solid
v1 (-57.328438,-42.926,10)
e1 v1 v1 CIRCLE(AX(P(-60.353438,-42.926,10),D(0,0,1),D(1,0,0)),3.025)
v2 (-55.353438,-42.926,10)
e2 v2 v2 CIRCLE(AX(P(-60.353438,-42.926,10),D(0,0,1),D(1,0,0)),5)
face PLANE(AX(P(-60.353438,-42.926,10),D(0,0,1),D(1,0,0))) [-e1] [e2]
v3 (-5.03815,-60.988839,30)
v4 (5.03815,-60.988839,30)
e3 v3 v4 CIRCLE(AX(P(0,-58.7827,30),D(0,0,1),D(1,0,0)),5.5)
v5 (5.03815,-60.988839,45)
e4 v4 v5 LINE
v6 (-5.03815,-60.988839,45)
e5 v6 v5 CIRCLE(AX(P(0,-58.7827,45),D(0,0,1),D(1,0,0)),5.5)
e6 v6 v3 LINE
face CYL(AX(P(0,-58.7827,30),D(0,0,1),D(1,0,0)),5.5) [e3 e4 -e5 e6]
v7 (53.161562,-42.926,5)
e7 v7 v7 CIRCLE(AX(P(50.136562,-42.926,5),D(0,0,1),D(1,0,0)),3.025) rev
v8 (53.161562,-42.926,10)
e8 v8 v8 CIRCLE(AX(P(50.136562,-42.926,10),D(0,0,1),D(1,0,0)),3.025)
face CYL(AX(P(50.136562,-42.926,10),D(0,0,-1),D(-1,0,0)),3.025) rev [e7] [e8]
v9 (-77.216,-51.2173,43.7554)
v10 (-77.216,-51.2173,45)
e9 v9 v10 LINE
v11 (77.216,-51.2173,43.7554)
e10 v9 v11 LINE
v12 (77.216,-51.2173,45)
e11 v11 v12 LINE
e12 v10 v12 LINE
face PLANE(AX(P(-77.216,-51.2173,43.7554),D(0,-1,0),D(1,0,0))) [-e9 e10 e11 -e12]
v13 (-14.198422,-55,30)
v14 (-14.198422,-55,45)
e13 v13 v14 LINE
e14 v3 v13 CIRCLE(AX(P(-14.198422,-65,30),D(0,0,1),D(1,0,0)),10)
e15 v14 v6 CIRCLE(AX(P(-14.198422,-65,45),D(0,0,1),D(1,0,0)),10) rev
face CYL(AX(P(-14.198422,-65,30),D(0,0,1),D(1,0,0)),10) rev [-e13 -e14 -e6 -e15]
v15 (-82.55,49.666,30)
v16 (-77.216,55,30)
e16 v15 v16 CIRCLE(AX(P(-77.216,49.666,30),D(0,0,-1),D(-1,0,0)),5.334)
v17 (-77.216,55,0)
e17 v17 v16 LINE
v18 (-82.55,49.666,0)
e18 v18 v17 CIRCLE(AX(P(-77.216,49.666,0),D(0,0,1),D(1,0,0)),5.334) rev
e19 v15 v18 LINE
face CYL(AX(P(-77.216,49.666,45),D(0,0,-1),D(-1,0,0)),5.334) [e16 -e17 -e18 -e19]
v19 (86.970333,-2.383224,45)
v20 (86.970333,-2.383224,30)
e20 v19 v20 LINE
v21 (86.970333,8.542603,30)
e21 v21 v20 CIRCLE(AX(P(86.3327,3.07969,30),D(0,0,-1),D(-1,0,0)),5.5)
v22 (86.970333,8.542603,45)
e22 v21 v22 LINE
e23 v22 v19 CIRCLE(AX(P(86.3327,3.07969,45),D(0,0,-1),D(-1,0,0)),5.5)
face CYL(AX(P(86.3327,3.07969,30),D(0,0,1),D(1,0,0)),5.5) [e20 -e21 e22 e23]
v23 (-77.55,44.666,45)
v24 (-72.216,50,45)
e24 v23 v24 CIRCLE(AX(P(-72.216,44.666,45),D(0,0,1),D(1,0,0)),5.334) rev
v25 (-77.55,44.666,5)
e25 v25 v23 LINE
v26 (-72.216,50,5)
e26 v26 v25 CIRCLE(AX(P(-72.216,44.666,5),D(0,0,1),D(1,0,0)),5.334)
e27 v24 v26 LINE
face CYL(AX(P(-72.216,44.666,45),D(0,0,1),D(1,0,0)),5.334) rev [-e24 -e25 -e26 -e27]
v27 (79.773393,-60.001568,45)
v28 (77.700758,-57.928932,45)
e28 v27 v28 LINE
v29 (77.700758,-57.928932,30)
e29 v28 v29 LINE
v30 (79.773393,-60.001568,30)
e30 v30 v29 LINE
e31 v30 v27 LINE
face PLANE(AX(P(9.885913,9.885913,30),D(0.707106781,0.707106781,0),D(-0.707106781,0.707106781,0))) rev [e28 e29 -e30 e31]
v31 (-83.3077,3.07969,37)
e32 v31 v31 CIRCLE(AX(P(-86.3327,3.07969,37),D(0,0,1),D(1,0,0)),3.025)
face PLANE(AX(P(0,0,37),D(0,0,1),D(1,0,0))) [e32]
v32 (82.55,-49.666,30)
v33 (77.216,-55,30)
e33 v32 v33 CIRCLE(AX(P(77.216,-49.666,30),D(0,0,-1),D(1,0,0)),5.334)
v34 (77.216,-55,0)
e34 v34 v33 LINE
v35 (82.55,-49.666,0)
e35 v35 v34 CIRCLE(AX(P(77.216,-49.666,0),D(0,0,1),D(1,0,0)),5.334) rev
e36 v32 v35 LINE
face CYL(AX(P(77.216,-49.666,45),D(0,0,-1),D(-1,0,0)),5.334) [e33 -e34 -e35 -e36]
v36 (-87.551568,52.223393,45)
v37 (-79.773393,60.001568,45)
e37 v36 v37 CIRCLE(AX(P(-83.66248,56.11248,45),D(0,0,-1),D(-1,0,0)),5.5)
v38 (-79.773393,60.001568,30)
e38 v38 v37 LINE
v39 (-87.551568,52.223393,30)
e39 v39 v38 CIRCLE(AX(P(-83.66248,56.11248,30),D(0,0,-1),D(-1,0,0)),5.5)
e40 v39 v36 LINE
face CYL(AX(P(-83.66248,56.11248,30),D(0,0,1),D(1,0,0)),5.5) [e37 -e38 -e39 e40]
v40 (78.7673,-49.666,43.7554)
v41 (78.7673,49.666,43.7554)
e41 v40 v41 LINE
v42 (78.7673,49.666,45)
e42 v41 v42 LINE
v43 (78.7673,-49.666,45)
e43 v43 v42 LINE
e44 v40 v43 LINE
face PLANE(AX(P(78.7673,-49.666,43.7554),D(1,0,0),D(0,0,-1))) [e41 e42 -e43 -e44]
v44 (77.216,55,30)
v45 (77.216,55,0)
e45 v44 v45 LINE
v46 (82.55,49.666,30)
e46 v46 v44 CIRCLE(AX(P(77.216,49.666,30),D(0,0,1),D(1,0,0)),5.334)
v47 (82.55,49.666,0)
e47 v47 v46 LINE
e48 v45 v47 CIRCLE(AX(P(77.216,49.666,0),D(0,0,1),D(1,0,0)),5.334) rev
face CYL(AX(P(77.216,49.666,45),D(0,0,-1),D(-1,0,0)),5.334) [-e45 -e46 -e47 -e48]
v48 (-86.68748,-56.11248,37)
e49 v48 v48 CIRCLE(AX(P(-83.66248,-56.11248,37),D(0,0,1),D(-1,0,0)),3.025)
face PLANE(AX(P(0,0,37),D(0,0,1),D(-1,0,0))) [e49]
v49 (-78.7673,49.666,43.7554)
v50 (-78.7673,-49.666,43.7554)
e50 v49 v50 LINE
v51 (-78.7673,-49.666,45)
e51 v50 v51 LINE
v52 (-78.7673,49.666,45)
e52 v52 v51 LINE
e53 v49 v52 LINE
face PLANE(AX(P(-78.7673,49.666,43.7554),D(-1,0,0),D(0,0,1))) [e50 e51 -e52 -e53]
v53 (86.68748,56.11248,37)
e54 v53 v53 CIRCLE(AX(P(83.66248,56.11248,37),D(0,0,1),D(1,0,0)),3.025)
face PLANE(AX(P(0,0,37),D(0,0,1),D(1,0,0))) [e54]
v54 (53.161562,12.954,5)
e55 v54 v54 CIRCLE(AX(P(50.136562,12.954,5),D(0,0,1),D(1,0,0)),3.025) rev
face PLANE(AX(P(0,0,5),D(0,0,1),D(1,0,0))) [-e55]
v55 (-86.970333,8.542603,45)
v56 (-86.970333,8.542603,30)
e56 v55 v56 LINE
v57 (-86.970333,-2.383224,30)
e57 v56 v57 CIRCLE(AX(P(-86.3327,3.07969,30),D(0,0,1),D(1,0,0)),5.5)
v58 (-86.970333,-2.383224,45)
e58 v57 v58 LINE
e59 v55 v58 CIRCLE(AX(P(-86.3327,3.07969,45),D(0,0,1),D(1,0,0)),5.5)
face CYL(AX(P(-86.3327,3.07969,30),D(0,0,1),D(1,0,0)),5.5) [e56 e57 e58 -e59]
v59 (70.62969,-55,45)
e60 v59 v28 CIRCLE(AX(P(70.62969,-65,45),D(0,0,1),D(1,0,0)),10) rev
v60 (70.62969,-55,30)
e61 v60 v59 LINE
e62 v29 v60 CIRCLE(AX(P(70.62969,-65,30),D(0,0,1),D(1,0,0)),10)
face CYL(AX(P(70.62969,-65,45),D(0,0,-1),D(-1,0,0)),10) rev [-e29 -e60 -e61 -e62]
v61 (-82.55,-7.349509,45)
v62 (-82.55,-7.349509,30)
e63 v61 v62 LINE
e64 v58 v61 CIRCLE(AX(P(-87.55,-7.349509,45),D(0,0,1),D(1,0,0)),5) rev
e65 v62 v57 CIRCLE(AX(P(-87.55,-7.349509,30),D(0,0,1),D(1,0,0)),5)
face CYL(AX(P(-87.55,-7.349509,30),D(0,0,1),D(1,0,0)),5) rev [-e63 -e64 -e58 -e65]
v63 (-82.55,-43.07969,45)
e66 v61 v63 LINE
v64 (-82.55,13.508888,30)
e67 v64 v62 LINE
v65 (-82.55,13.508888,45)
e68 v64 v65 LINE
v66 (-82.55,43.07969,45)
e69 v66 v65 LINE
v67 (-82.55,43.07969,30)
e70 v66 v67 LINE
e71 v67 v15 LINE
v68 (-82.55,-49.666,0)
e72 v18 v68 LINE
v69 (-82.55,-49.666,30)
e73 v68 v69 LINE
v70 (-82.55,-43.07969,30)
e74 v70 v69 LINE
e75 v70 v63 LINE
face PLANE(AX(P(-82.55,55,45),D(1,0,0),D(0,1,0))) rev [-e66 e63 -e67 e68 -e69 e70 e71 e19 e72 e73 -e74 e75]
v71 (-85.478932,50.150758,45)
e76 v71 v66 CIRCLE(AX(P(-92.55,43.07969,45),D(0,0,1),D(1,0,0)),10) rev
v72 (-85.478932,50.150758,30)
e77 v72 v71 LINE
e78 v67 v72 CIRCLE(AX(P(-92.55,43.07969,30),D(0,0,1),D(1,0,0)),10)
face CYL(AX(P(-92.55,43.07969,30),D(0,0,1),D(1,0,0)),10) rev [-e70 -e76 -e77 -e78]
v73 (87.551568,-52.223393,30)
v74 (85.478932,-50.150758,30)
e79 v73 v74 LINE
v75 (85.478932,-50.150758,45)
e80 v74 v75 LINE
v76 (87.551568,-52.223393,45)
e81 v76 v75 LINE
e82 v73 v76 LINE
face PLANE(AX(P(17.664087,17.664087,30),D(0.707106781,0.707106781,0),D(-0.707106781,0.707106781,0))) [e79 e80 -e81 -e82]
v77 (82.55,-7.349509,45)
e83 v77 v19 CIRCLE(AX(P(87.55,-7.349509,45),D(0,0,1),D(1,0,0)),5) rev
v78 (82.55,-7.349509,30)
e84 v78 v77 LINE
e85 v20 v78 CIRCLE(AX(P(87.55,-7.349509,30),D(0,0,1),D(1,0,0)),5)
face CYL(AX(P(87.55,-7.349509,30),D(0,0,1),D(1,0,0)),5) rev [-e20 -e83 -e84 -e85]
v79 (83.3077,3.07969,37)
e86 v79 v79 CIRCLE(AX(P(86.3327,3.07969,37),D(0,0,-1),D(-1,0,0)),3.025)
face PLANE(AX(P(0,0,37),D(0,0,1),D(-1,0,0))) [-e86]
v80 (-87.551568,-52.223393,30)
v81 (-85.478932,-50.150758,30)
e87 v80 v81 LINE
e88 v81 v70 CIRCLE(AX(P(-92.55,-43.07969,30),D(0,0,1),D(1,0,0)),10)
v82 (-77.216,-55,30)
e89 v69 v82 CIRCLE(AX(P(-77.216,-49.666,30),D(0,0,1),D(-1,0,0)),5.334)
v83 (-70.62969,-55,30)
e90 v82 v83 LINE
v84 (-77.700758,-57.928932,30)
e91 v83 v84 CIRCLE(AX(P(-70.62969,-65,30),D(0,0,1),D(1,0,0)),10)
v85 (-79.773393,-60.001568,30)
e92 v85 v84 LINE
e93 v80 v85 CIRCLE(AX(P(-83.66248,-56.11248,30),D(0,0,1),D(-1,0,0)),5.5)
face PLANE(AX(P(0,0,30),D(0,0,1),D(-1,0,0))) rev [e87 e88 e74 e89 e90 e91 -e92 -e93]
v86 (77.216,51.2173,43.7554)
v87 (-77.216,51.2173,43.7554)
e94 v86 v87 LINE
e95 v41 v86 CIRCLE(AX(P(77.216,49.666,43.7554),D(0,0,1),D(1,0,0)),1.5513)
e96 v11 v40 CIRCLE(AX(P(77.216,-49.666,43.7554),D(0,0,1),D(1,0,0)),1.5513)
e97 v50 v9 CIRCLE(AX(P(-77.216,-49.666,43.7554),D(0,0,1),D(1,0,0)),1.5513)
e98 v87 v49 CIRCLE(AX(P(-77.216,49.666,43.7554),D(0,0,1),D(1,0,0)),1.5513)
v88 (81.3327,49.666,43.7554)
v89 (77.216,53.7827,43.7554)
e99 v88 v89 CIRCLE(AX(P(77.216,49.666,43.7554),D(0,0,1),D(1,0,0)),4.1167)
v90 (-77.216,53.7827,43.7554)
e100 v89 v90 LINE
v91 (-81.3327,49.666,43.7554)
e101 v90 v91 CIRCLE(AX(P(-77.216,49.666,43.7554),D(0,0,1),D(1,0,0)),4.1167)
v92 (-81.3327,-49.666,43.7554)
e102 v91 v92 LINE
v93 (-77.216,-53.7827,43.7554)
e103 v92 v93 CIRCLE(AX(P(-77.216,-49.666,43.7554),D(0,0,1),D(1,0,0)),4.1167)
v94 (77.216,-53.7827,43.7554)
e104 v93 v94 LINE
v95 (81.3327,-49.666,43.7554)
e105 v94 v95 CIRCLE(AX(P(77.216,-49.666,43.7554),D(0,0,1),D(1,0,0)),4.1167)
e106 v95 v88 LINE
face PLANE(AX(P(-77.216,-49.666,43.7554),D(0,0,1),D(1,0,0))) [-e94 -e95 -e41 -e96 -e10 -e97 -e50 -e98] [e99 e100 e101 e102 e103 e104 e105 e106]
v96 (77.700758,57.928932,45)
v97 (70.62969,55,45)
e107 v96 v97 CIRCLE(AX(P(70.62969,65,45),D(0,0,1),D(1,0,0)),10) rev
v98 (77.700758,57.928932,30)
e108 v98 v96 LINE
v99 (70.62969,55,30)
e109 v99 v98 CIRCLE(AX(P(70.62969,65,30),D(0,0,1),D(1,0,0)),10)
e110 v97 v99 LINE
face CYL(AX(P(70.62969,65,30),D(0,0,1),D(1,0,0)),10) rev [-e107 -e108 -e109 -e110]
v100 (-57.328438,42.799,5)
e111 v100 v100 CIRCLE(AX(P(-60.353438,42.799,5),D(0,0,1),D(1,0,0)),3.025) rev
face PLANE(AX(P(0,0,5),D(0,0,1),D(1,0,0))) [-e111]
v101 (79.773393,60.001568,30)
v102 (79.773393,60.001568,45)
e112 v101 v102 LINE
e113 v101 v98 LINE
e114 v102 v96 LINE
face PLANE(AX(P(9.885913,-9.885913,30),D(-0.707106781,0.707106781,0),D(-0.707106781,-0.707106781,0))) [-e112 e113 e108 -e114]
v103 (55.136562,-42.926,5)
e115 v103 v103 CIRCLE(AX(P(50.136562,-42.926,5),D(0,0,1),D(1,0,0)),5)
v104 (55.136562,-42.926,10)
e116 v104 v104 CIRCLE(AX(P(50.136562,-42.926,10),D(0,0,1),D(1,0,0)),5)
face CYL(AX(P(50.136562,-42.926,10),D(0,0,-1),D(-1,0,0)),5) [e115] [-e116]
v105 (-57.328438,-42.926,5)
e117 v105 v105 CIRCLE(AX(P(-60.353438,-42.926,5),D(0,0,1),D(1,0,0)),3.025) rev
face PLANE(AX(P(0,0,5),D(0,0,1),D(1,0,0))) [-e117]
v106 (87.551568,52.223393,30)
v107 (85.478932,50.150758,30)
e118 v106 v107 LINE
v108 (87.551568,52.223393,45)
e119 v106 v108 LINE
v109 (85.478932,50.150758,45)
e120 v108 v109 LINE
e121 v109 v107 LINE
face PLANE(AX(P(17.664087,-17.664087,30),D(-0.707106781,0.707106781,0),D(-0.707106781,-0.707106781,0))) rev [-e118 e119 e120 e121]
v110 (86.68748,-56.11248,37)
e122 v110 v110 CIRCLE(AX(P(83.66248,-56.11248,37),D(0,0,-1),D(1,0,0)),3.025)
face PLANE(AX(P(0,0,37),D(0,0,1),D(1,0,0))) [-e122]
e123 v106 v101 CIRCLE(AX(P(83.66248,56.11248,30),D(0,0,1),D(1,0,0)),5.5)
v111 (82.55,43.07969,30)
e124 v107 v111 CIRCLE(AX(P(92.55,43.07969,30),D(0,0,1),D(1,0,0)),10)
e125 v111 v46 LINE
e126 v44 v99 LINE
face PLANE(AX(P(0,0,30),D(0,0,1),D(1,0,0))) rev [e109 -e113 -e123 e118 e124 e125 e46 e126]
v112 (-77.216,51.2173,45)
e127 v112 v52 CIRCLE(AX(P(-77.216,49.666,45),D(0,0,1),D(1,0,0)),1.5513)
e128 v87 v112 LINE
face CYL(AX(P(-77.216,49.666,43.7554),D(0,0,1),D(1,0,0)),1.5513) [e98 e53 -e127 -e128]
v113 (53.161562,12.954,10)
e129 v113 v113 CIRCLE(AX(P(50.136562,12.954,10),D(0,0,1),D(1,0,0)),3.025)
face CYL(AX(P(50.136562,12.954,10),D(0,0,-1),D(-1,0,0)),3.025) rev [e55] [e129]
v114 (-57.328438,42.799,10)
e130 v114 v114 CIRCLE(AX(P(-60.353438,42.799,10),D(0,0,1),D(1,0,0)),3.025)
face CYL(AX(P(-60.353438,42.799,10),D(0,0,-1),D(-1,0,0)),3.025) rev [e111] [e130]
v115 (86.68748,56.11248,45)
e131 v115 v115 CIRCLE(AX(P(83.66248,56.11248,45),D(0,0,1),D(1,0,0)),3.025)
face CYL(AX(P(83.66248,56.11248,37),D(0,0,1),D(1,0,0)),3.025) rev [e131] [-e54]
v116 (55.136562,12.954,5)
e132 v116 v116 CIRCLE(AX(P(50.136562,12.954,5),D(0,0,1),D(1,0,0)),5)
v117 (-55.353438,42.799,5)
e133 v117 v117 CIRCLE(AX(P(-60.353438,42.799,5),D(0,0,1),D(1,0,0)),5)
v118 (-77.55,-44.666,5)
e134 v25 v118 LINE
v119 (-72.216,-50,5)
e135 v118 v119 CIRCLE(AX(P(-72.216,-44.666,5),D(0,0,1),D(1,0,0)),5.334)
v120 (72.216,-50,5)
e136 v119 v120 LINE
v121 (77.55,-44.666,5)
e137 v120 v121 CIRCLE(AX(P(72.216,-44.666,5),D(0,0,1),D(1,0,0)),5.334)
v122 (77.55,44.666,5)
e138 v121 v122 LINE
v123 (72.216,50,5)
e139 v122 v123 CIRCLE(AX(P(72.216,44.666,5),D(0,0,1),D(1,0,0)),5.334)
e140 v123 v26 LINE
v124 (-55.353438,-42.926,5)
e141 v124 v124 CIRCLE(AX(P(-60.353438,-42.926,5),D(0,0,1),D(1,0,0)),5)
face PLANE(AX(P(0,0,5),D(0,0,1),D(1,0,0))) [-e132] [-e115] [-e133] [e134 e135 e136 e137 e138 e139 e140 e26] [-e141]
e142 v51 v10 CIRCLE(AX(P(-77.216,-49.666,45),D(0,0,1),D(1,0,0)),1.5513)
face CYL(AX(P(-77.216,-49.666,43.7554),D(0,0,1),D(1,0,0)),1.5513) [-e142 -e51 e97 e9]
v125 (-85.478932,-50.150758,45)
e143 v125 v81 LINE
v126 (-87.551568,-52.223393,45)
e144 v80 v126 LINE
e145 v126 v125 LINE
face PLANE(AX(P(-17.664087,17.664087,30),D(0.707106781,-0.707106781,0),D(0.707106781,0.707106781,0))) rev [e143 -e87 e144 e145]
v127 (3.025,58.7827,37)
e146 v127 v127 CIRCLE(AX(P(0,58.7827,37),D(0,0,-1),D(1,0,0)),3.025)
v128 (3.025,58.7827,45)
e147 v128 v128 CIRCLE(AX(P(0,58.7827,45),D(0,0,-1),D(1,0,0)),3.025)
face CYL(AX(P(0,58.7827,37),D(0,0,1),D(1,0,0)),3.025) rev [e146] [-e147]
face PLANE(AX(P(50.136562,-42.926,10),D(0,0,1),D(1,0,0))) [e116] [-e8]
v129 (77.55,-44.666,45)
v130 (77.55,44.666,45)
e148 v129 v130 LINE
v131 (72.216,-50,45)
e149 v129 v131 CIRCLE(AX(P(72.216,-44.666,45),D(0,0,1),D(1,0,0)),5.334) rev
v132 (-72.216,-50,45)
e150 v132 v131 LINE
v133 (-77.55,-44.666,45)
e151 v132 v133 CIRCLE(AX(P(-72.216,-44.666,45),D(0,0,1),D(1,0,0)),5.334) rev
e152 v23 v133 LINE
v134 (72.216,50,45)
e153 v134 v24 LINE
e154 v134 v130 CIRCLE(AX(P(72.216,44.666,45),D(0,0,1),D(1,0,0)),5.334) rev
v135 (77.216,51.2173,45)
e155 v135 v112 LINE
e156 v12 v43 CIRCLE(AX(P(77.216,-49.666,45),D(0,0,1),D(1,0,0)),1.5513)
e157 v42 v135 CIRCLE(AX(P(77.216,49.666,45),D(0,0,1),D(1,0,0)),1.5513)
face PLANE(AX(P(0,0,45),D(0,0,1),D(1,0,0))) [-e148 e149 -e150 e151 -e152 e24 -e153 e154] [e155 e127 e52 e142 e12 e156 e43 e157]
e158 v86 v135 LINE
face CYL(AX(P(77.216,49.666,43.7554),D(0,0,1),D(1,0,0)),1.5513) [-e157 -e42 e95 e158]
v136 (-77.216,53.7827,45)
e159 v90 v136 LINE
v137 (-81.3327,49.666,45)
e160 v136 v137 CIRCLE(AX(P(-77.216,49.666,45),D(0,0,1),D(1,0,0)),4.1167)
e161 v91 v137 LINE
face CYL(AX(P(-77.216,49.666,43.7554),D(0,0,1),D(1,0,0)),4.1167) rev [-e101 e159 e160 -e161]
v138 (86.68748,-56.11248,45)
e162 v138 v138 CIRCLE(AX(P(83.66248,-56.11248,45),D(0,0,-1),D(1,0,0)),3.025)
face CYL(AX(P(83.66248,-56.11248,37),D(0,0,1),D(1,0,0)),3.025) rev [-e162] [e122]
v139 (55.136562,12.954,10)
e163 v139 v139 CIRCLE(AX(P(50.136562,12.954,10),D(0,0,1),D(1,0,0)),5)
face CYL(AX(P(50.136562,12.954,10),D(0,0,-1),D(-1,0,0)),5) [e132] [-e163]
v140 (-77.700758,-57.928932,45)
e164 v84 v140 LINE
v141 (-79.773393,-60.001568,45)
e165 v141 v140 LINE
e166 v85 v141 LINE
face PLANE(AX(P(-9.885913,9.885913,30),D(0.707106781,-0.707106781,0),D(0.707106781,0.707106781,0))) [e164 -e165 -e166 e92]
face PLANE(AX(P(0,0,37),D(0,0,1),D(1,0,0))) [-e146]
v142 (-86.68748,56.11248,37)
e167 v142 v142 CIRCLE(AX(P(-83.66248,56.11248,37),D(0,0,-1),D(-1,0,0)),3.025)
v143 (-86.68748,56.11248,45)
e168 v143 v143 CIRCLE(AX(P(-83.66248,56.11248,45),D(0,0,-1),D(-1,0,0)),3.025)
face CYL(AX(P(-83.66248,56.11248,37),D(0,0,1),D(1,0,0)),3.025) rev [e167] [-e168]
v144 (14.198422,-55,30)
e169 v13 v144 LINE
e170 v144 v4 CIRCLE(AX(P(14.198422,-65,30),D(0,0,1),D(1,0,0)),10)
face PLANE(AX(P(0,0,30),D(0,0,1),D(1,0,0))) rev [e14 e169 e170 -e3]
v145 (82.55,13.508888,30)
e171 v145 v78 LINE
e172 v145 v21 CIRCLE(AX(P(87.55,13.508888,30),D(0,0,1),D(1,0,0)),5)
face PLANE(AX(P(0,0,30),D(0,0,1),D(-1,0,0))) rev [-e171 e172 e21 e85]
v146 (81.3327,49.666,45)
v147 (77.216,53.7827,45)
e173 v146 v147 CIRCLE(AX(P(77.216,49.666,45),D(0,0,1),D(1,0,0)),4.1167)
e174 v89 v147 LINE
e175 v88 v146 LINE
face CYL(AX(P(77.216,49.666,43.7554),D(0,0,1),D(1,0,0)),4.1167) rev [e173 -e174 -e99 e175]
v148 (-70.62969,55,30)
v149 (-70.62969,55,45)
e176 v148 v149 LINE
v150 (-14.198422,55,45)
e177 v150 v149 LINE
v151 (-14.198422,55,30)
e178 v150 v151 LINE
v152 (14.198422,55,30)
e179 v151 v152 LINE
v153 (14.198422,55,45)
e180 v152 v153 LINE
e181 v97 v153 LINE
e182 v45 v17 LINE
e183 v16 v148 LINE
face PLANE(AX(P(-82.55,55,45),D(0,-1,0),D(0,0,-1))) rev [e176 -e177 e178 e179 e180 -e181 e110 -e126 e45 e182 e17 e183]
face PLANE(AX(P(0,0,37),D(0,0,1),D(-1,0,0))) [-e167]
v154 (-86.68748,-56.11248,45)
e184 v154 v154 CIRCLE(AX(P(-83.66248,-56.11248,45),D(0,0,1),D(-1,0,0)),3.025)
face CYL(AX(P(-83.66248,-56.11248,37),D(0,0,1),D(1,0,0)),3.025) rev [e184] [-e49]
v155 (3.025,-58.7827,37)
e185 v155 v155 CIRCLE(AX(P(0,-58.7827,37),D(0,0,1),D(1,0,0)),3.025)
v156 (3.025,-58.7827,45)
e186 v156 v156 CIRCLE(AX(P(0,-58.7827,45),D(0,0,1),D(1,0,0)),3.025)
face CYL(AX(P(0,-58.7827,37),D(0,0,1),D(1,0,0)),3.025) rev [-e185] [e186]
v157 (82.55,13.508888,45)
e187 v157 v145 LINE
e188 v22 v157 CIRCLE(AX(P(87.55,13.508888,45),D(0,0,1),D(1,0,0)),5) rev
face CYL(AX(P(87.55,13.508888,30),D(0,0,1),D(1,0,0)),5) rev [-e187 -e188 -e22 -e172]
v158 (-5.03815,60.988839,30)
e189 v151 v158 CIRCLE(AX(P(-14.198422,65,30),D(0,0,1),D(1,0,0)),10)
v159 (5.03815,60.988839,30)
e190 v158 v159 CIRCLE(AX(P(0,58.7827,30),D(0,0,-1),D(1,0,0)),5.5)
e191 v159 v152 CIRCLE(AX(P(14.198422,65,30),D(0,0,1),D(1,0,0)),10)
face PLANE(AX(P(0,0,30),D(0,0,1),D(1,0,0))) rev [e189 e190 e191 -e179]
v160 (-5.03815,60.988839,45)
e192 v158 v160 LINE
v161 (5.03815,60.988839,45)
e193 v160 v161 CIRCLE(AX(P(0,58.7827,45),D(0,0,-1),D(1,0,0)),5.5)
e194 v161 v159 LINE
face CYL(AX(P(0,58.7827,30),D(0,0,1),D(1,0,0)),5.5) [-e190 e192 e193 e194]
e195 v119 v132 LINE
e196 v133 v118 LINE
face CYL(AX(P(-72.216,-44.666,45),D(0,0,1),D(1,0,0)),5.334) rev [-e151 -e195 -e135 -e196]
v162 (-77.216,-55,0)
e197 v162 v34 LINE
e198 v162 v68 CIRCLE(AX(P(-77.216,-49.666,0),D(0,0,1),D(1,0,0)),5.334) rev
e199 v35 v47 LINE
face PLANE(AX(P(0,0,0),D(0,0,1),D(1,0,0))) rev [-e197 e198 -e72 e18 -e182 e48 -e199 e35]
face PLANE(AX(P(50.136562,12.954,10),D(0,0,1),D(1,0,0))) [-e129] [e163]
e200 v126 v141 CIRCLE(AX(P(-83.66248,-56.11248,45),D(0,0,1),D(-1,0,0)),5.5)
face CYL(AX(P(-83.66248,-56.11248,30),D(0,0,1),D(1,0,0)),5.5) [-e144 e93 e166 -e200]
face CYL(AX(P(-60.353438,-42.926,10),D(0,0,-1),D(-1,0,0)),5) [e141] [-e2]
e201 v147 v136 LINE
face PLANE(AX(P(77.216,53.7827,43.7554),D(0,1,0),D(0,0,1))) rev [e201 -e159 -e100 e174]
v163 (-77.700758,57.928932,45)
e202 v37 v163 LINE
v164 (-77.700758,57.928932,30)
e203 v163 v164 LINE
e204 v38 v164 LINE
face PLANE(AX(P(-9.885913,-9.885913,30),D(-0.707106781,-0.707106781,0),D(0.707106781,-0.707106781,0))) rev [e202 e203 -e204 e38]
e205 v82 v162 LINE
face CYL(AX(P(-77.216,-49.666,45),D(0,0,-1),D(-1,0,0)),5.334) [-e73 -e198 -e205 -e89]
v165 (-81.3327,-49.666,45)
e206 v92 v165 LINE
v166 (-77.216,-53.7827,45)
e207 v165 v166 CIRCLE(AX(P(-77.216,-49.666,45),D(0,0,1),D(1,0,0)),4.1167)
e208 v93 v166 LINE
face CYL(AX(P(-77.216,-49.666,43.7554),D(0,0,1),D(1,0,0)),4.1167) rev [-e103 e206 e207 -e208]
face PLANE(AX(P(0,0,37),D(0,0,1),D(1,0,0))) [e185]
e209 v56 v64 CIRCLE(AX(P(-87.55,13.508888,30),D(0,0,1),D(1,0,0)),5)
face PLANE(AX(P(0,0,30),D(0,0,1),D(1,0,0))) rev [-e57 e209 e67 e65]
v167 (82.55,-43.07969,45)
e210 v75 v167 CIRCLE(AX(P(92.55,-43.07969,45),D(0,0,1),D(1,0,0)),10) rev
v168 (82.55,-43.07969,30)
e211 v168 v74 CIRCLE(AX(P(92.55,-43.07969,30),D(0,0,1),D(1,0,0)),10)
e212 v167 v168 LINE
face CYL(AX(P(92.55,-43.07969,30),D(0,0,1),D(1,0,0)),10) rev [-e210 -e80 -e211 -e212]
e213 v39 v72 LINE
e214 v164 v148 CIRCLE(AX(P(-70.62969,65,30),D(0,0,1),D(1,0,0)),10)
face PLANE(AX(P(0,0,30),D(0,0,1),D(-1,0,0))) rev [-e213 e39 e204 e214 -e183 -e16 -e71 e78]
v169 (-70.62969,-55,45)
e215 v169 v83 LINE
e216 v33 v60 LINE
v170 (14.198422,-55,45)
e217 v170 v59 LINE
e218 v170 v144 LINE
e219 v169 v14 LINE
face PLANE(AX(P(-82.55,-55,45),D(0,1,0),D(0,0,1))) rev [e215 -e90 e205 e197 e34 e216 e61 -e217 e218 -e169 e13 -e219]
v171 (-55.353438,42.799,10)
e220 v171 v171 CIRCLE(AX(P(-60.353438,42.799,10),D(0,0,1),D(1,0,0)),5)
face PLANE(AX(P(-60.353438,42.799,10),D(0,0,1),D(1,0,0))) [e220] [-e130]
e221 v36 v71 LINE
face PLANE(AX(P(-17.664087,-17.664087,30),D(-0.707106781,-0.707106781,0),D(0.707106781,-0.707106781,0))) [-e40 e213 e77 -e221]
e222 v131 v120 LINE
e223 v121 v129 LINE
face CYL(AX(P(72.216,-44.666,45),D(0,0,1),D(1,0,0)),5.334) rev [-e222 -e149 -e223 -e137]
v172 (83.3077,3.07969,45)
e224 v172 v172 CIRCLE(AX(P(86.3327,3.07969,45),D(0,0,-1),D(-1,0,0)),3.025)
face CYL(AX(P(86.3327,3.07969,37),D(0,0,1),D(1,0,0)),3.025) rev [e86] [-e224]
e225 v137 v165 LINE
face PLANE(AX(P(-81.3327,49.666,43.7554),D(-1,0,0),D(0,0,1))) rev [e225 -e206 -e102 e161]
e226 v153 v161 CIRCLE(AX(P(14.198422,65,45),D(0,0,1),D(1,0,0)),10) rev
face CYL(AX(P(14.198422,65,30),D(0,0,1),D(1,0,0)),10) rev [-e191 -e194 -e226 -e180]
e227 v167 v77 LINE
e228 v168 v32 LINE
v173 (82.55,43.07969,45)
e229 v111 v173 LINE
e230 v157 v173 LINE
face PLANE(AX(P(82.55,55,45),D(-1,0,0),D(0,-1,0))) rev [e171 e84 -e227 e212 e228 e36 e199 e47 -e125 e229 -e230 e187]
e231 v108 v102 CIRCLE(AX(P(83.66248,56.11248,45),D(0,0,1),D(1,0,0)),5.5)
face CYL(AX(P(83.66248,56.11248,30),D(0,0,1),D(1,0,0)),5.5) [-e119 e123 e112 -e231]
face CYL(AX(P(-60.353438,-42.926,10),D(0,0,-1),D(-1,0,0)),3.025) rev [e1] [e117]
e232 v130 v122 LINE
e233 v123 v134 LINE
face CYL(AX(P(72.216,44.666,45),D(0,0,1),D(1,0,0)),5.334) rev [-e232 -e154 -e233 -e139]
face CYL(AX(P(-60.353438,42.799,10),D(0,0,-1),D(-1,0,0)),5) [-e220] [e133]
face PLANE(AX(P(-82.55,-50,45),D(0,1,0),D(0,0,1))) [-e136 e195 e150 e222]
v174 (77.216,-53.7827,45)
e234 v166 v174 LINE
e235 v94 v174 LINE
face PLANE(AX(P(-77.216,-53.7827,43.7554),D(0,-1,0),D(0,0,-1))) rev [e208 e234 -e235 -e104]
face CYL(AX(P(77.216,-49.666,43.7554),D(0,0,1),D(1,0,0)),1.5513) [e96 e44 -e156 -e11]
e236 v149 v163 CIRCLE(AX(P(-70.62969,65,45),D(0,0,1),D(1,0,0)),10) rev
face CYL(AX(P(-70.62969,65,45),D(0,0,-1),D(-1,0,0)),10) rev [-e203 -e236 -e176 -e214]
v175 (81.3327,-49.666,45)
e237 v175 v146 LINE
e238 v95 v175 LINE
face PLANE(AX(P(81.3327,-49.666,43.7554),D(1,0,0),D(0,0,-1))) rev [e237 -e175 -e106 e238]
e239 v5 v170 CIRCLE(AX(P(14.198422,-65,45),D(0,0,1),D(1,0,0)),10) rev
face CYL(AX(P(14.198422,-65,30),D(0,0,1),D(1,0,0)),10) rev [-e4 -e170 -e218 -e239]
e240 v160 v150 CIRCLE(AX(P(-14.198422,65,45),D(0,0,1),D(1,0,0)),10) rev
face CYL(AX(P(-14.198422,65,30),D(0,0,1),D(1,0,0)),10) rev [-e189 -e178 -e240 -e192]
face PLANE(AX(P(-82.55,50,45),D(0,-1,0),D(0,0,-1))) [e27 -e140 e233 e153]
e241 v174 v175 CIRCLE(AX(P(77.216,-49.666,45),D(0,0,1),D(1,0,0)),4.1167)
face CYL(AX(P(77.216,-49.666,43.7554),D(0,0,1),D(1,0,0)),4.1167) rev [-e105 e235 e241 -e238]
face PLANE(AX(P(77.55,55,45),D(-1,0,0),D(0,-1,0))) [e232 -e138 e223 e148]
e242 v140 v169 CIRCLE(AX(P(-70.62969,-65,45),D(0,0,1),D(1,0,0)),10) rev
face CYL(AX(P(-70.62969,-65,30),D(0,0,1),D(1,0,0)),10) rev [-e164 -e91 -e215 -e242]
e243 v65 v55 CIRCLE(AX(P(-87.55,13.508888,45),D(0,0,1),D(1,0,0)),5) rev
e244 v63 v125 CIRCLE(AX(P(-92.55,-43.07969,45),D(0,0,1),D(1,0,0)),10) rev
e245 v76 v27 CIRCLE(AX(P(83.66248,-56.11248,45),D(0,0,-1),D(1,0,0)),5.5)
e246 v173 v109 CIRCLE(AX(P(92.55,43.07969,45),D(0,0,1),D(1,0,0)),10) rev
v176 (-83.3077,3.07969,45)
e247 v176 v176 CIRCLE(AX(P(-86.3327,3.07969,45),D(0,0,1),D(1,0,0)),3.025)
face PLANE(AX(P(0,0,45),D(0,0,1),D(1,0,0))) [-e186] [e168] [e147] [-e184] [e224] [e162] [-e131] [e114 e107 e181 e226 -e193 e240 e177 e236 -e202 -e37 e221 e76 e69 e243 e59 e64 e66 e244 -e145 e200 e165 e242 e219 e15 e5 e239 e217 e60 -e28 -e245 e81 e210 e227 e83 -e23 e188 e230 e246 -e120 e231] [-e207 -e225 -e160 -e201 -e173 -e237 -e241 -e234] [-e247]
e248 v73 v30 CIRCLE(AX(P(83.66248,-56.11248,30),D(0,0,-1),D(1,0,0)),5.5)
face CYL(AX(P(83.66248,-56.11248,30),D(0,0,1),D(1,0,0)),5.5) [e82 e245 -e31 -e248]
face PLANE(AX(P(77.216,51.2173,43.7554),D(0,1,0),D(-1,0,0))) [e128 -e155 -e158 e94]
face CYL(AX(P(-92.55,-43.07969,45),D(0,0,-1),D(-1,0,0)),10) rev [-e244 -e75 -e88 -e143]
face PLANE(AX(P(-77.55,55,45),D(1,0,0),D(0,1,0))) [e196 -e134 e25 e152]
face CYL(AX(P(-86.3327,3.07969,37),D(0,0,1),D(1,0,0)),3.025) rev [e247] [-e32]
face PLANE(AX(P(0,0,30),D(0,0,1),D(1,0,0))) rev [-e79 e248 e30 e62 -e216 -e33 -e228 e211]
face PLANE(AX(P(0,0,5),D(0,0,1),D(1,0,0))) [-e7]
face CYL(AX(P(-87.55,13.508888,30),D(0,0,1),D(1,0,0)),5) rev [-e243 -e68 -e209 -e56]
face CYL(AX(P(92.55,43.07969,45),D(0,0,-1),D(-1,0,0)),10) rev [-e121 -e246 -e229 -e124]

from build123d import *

# Parameters (mm, degrees)
SKETCH1_W               = 165.1
SKETCH1_H               = 110
BOSS_EXTRUDE1_DEPTH     = 45
SHELL1_T                = -5
FILLET1_R               = 5.334
CUT_EXTRUDE1_DEPTH      = 1.2446
BOSS_EXTRUDE2_DEPTH     = 15
SKETCH4_R               = 3.025
CUT_EXTRUDE2_DEPTH      = 8
MIRROR3_COPY_1_DEPTH    = 15
MIRROR3_COPY_2_SKETCH_R = 3.025
MIRROR3_COPY_2_DEPTH    = 8
FILLET3_R               = 10
BOSS_EXTRUDE3_DEPTH     = 15
SKETCH6_R               = 3.025
CUT_EXTRUDE3_DEPTH      = 8
FILLET5_R               = 10
BOSS_EXTRUDE4_DEPTH     = 15
SKETCH8_R               = 3.025
CUT_EXTRUDE4_DEPTH      = 8
FILLET6_R               = 5
SKETCH9_R               = 5
SKETCH9_R_2             = 3.025
BOSS_EXTRUDE5_DEPTH     = 5


with BuildPart() as part:
    # Sketch1 → Boss-Extrude1 (new body)
    with BuildSketch(Plane.XY):
        Rectangle(SKETCH1_W, SKETCH1_H)
    extrude(amount=BOSS_EXTRUDE1_DEPTH)

    # Shell1
    shell1_openings = [part.faces().sort_by_distance(p)[0] for p in [
        (0, 0, 45),
    ]]
    offset(amount=SHELL1_T, openings=shell1_openings, kind=Kind.INTERSECTION)

    # Fillet1
    fillet1_edges = [part.edges().sort_by_distance(p)[0] for p in [
        (77.55, -50, 25),
        (77.55, 50, 25),
        (-77.55, 50, 25),
        (-77.55, -50, 25),
        (82.55, -55, 22.5),
        (-82.55, -55, 22.5),
        (-82.55, 55, 22.5),
        (82.55, 55, 22.5),
    ]]
    fillet(fillet1_edges, radius=FILLET1_R)

    # Sketch2 → Cut-Extrude1 (cut)
    with BuildSketch(Plane.XY.offset(45)):
        with BuildLine():
            Line((-77.216, -53.7827), (77.216, -53.7827))
            ThreePointArc((77.216, -53.7827), (80.126946486, -52.576946486), (81.3327, -49.666))
            Line((81.3327, -49.666), (81.3327, 49.666))
            ThreePointArc((81.3327, 49.666), (80.126946486, 52.576946486), (77.216, 53.7827))
            Line((77.216, 53.7827), (-77.216, 53.7827))
            ThreePointArc((-77.216, 53.7827), (-80.126946486, 52.576946486), (-81.3327, 49.666))
            Line((-81.3327, 49.666), (-81.3327, -49.666))
            ThreePointArc((-81.3327, -49.666), (-80.126946486, -52.576946486), (-77.216, -53.7827))
        make_face()
        with BuildLine():
            Line((-78.7673, 49.666), (-78.7673, -49.666))
            ThreePointArc((-78.7673, -49.666), (-78.31293475, -50.76293475), (-77.216, -51.2173))
            Line((-77.216, -51.2173), (77.216, -51.2173))
            ThreePointArc((77.216, -51.2173), (78.31293475, -50.76293475), (78.7673, -49.666))
            Line((78.7673, -49.666), (78.7673, 49.666))
            ThreePointArc((78.7673, 49.666), (78.31293475, 50.76293475), (77.216, 51.2173))
            Line((77.216, 51.2173), (-77.216, 51.2173))
            ThreePointArc((-77.216, 51.2173), (-78.31293475, 50.76293475), (-78.7673, 49.666))
        make_face(mode=Mode.SUBTRACT)
    extrude(amount=-CUT_EXTRUDE1_DEPTH, mode=Mode.SUBTRACT)

    # Sketch3 → Boss-Extrude2 (add)
    with BuildSketch(Plane.XY.offset(45)):
        with BuildLine():
            ThreePointArc((80.987707571, 53.437707571), (82.143973426, 51.707233428), (82.55, 49.666))
            Line((82.55, 49.666), (82.55, 47.221825407))
            Line((82.55, 47.221825407), (87.551567689, 52.223393096))
            ThreePointArc((87.551567689, 52.223393096), (87.551567689, 60.001567689), (79.773393096, 60.001567689))
            Line((79.773393096, 60.001567689), (74.771825407, 55))
            Line((74.771825407, 55), (77.216, 55))
            ThreePointArc((77.216, 55), (79.257233428, 54.593973426), (80.987707571, 53.437707571))
        make_face()
    boss_extrude2 = extrude(amount=-BOSS_EXTRUDE2_DEPTH)

    # Sketch4 → Cut-Extrude2 (cut)
    with BuildSketch(Plane.XY.offset(45)):
        with Locations((83.662480392, 56.112480392)):
            Circle(SKETCH4_R)
    cut_extrude2 = extrude(amount=-CUT_EXTRUDE2_DEPTH, mode=Mode.SUBTRACT)

    # Mirror2: Boss-Extrude2, Cut-Extrude2 across plane
    add(boss_extrude2.mirror(Plane.ZX))
    add(cut_extrude2.mirror(Plane.ZX), mode=Mode.SUBTRACT)

    # Mirror3: Boss-Extrude2, Cut-Extrude2 across plane
    add(boss_extrude2.mirror(Plane(origin=(0, 0, 0), x_dir=(0, 0, 1), z_dir=(1, 0, 0))))
    add(cut_extrude2.mirror(Plane(origin=(0, 0, 0), x_dir=(0, 0, 1), z_dir=(1, 0, 0))), mode=Mode.SUBTRACT)

    # Mirror3 copy 1 sketch → Mirror3 copy 1 (add)
    with BuildSketch(Plane(origin=(0, 0, 45), x_dir=(-1, 0, 0), z_dir=(0, 0, 1))):
        with BuildLine():
            ThreePointArc((80.987707571, 53.437707571), (82.143973426, 51.707233428), (82.55, 49.666))
            Line((82.55, 49.666), (82.55, 47.221825407))
            Line((82.55, 47.221825407), (87.551567689, 52.223393096))
            ThreePointArc((87.551567689, 52.223393096), (87.551567689, 60.001567689), (79.773393096, 60.001567689))
            Line((79.773393096, 60.001567689), (74.771825407, 55))
            Line((74.771825407, 55), (77.216, 55))
            ThreePointArc((77.216, 55), (79.257233428, 54.593973426), (80.987707571, 53.437707571))
        make_face()
    extrude(amount=-MIRROR3_COPY_1_DEPTH)

    # Mirror3 copy 2 sketch → Mirror3 copy 2 (cut)
    with BuildSketch(Plane(origin=(0, 0, 45), x_dir=(-1, 0, 0), z_dir=(0, 0, 1))):
        with Locations((83.662480392, 56.112480392)):
            Circle(MIRROR3_COPY_2_SKETCH_R)
    extrude(amount=-MIRROR3_COPY_2_DEPTH, mode=Mode.SUBTRACT)

    # Fillet3
    fillet3_edges = [part.edges().sort_by_distance(p)[0] for p in [
        (82.55, 47.221825407, 37.5),
        (74.771825407, 55, 37.5),
        (82.55, -47.221825407, 37.5),
        (74.771825407, -55, 37.5),
        (-82.55, -47.221825407, 37.5),
        (-74.771825407, -55, 37.5),
        (-82.55, 47.221825407, 37.5),
        (-74.771825407, 55, 37.5),
    ]]
    fillet(fillet3_edges, radius=FILLET3_R)

    # Sketch5 → Boss-Extrude3 (add)
    with BuildSketch(Plane.XY.offset(45)):
        with BuildLine():
            Line((0, -55), (-5.5, -55))
            Line((-5.5, -55), (-5.5, -58.7827))
            ThreePointArc((-5.5, -58.7827), (0, -64.2827), (5.5, -58.7827))
            Line((5.5, -58.7827), (5.5, -55))
            Line((5.5, -55), (0, -55))
        make_face()
    boss_extrude3 = extrude(amount=-BOSS_EXTRUDE3_DEPTH)

    # Sketch6 → Cut-Extrude3 (cut)
    with BuildSketch(Plane.XY.offset(45)):
        with Locations((0, -58.7827)):
            Circle(SKETCH6_R)
    cut_extrude3 = extrude(amount=-CUT_EXTRUDE3_DEPTH, mode=Mode.SUBTRACT)

    # Mirror10: Boss-Extrude3, Cut-Extrude3 across plane
    add(boss_extrude3.mirror(Plane.ZX))
    add(cut_extrude3.mirror(Plane.ZX), mode=Mode.SUBTRACT)

    # Fillet5
    # the kernel refuses this fillet: 10 mm, written as the material it adds along each edge
    with BuildSketch(Plane(origin=(5.5, 55, 45), x_dir=(1, 0, 0), z_dir=(0, 0, -1)), Plane(origin=(-5.5, -55, 45), x_dir=(-1, 0, 0), z_dir=(0, 0, -1))) as fillet5_piece_1:
        with BuildLine():
            CenterArc((8.698421768, -10), FILLET5_R, 90, 66.352028346)
            Line((-0.46185034, -5.98883871), (-1.377877551, -5.587722581))
            ThreePointArc((-1.377877551, -5.587722581), (-1, -3.7827), (-1, 0))
            Line((-1, 0), (0, 1))
            Line((0, 1), (8.698421768, 1))
            Line((8.698421768, 1), (8.698421768, 0))
        make_face()
    extrude(amount=15)
    with BuildSketch(Plane(origin=(-5.5, 55, 45), x_dir=(-1, 0, 0), z_dir=(0, 0, -1)), Plane(origin=(5.5, -55, 45), x_dir=(1, 0, 0), z_dir=(0, 0, -1))) as fillet5_piece_2:
        with BuildLine():
            CenterArc((8.698421768, 10), FILLET5_R, 203.647971654, 66.352028346)
            Line((-0.46185034, 5.98883871), (-1.377877551, 5.587722581))
            ThreePointArc((-1.377877551, 5.587722581), (-1, 3.7827), (-1, 0))
            Line((-1, 0), (0, -1))
            Line((0, -1), (8.698421768, -1))
            Line((8.698421768, -1), (8.698421768, 0))
        make_face()
    extrude(amount=15)

    # Sketch7 → Boss-Extrude4 (add)
    with BuildSketch(Plane.XY.offset(45)):
        with BuildLine():
            Line((-82.55, 3.079689783), (-82.55, 8.579689783))
            Line((-82.55, 8.579689783), (-86.3327, 8.579689783))
            ThreePointArc((-86.3327, 8.579689783), (-91.8327, 3.079689783), (-86.3327, -2.420310217))
            Line((-86.3327, -2.420310217), (-82.55, -2.420310217))
            Line((-82.55, -2.420310217), (-82.55, 3.079689783))
        make_face()
    boss_extrude4 = extrude(amount=-BOSS_EXTRUDE4_DEPTH)

    # Sketch8 → Cut-Extrude4 (cut)
    with BuildSketch(Plane.XY.offset(45)):
        with Locations((-86.3327, 3.079689783)):
            Circle(SKETCH8_R)
    cut_extrude4 = extrude(amount=-CUT_EXTRUDE4_DEPTH, mode=Mode.SUBTRACT)

    # Mirror11: Boss-Extrude4, Cut-Extrude4 across plane
    add(boss_extrude4.mirror(Plane(origin=(0, 0, 0), x_dir=(0, 0, 1), z_dir=(1, 0, 0))))
    add(cut_extrude4.mirror(Plane(origin=(0, 0, 0), x_dir=(0, 0, 1), z_dir=(1, 0, 0))), mode=Mode.SUBTRACT)

    # Fillet6
    # the kernel refuses this fillet: 5 mm, written as the material it adds along each edge
    with BuildSketch(Plane(origin=(82.55, 8.579689783, 45), x_dir=(0, 1, 0), z_dir=(0, 0, -1)), Plane(origin=(-82.55, -2.420310217, 45), x_dir=(0, -1, 0), z_dir=(0, 0, -1))) as fillet6_piece_1:
        with BuildLine():
            CenterArc((4.929198469, 5), FILLET6_R, 186.657461203, 83.342538797)
            Line((-0.037086516, 4.420333333), (-0.533715015, 4.362366667))
            ThreePointArc((-0.533715015, 4.362366667), (-0.5, 3.7827), (-0.5, 0))
            Line((-0.5, 0), (0, -0.5))
            Line((0, -0.5), (4.929198469, -0.5))
            Line((4.929198469, -0.5), (4.929198469, 0))
        make_face()
    extrude(amount=15)
    with BuildSketch(Plane(origin=(82.55, -2.420310217, 45), x_dir=(0, -1, 0), z_dir=(0, 0, -1)), Plane(origin=(-82.55, 8.579689783, 45), x_dir=(0, 1, 0), z_dir=(0, 0, -1))) as fillet6_piece_2:
        with BuildLine():
            CenterArc((4.929198469, -5), FILLET6_R, 90, 83.342538797)
            Line((-0.037086516, -4.420333333), (-0.533715015, -4.362366667))
            ThreePointArc((-0.533715015, -4.362366667), (-0.5, -3.7827), (-0.5, 0))
            Line((-0.5, 0), (0, 0.5))
            Line((0, 0.5), (4.929198469, 0.5))
            Line((4.929198469, 0.5), (4.929198469, 0))
        make_face()
    extrude(amount=15)

    # Sketch9 → Boss-Extrude5 (add)
    # profile 1 of 4: a face of its own
    with BuildSketch(Plane.XY.offset(5)):
        with Locations((-60.35343772, -42.926)):
            Circle(SKETCH9_R)
        with Locations((-60.35343772, -42.926)):
            Circle(SKETCH9_R_2, mode=Mode.SUBTRACT)
    # profile 2 of 4: a face of its own
    with BuildSketch(Plane.XY.offset(5)):
        with Locations((50.13656228, -42.926)):
            Circle(SKETCH9_R)
        with Locations((50.13656228, -42.926)):
            Circle(SKETCH9_R_2, mode=Mode.SUBTRACT)
    # profile 3 of 4: a face of its own
    with BuildSketch(Plane.XY.offset(5)):
        with Locations((50.13656228, 12.954)):
            Circle(SKETCH9_R)
        with Locations((50.13656228, 12.954)):
            Circle(SKETCH9_R_2, mode=Mode.SUBTRACT)
    # profile 4 of 4: a face of its own
    with BuildSketch(Plane.XY.offset(5)):
        with Locations((-60.35343772, 42.799)):
            Circle(SKETCH9_R)
        with Locations((-60.35343772, 42.799)):
            Circle(SKETCH9_R_2, mode=Mode.SUBTRACT)
    extrude(amount=BOSS_EXTRUDE5_DEPTH)


solid = part.part
